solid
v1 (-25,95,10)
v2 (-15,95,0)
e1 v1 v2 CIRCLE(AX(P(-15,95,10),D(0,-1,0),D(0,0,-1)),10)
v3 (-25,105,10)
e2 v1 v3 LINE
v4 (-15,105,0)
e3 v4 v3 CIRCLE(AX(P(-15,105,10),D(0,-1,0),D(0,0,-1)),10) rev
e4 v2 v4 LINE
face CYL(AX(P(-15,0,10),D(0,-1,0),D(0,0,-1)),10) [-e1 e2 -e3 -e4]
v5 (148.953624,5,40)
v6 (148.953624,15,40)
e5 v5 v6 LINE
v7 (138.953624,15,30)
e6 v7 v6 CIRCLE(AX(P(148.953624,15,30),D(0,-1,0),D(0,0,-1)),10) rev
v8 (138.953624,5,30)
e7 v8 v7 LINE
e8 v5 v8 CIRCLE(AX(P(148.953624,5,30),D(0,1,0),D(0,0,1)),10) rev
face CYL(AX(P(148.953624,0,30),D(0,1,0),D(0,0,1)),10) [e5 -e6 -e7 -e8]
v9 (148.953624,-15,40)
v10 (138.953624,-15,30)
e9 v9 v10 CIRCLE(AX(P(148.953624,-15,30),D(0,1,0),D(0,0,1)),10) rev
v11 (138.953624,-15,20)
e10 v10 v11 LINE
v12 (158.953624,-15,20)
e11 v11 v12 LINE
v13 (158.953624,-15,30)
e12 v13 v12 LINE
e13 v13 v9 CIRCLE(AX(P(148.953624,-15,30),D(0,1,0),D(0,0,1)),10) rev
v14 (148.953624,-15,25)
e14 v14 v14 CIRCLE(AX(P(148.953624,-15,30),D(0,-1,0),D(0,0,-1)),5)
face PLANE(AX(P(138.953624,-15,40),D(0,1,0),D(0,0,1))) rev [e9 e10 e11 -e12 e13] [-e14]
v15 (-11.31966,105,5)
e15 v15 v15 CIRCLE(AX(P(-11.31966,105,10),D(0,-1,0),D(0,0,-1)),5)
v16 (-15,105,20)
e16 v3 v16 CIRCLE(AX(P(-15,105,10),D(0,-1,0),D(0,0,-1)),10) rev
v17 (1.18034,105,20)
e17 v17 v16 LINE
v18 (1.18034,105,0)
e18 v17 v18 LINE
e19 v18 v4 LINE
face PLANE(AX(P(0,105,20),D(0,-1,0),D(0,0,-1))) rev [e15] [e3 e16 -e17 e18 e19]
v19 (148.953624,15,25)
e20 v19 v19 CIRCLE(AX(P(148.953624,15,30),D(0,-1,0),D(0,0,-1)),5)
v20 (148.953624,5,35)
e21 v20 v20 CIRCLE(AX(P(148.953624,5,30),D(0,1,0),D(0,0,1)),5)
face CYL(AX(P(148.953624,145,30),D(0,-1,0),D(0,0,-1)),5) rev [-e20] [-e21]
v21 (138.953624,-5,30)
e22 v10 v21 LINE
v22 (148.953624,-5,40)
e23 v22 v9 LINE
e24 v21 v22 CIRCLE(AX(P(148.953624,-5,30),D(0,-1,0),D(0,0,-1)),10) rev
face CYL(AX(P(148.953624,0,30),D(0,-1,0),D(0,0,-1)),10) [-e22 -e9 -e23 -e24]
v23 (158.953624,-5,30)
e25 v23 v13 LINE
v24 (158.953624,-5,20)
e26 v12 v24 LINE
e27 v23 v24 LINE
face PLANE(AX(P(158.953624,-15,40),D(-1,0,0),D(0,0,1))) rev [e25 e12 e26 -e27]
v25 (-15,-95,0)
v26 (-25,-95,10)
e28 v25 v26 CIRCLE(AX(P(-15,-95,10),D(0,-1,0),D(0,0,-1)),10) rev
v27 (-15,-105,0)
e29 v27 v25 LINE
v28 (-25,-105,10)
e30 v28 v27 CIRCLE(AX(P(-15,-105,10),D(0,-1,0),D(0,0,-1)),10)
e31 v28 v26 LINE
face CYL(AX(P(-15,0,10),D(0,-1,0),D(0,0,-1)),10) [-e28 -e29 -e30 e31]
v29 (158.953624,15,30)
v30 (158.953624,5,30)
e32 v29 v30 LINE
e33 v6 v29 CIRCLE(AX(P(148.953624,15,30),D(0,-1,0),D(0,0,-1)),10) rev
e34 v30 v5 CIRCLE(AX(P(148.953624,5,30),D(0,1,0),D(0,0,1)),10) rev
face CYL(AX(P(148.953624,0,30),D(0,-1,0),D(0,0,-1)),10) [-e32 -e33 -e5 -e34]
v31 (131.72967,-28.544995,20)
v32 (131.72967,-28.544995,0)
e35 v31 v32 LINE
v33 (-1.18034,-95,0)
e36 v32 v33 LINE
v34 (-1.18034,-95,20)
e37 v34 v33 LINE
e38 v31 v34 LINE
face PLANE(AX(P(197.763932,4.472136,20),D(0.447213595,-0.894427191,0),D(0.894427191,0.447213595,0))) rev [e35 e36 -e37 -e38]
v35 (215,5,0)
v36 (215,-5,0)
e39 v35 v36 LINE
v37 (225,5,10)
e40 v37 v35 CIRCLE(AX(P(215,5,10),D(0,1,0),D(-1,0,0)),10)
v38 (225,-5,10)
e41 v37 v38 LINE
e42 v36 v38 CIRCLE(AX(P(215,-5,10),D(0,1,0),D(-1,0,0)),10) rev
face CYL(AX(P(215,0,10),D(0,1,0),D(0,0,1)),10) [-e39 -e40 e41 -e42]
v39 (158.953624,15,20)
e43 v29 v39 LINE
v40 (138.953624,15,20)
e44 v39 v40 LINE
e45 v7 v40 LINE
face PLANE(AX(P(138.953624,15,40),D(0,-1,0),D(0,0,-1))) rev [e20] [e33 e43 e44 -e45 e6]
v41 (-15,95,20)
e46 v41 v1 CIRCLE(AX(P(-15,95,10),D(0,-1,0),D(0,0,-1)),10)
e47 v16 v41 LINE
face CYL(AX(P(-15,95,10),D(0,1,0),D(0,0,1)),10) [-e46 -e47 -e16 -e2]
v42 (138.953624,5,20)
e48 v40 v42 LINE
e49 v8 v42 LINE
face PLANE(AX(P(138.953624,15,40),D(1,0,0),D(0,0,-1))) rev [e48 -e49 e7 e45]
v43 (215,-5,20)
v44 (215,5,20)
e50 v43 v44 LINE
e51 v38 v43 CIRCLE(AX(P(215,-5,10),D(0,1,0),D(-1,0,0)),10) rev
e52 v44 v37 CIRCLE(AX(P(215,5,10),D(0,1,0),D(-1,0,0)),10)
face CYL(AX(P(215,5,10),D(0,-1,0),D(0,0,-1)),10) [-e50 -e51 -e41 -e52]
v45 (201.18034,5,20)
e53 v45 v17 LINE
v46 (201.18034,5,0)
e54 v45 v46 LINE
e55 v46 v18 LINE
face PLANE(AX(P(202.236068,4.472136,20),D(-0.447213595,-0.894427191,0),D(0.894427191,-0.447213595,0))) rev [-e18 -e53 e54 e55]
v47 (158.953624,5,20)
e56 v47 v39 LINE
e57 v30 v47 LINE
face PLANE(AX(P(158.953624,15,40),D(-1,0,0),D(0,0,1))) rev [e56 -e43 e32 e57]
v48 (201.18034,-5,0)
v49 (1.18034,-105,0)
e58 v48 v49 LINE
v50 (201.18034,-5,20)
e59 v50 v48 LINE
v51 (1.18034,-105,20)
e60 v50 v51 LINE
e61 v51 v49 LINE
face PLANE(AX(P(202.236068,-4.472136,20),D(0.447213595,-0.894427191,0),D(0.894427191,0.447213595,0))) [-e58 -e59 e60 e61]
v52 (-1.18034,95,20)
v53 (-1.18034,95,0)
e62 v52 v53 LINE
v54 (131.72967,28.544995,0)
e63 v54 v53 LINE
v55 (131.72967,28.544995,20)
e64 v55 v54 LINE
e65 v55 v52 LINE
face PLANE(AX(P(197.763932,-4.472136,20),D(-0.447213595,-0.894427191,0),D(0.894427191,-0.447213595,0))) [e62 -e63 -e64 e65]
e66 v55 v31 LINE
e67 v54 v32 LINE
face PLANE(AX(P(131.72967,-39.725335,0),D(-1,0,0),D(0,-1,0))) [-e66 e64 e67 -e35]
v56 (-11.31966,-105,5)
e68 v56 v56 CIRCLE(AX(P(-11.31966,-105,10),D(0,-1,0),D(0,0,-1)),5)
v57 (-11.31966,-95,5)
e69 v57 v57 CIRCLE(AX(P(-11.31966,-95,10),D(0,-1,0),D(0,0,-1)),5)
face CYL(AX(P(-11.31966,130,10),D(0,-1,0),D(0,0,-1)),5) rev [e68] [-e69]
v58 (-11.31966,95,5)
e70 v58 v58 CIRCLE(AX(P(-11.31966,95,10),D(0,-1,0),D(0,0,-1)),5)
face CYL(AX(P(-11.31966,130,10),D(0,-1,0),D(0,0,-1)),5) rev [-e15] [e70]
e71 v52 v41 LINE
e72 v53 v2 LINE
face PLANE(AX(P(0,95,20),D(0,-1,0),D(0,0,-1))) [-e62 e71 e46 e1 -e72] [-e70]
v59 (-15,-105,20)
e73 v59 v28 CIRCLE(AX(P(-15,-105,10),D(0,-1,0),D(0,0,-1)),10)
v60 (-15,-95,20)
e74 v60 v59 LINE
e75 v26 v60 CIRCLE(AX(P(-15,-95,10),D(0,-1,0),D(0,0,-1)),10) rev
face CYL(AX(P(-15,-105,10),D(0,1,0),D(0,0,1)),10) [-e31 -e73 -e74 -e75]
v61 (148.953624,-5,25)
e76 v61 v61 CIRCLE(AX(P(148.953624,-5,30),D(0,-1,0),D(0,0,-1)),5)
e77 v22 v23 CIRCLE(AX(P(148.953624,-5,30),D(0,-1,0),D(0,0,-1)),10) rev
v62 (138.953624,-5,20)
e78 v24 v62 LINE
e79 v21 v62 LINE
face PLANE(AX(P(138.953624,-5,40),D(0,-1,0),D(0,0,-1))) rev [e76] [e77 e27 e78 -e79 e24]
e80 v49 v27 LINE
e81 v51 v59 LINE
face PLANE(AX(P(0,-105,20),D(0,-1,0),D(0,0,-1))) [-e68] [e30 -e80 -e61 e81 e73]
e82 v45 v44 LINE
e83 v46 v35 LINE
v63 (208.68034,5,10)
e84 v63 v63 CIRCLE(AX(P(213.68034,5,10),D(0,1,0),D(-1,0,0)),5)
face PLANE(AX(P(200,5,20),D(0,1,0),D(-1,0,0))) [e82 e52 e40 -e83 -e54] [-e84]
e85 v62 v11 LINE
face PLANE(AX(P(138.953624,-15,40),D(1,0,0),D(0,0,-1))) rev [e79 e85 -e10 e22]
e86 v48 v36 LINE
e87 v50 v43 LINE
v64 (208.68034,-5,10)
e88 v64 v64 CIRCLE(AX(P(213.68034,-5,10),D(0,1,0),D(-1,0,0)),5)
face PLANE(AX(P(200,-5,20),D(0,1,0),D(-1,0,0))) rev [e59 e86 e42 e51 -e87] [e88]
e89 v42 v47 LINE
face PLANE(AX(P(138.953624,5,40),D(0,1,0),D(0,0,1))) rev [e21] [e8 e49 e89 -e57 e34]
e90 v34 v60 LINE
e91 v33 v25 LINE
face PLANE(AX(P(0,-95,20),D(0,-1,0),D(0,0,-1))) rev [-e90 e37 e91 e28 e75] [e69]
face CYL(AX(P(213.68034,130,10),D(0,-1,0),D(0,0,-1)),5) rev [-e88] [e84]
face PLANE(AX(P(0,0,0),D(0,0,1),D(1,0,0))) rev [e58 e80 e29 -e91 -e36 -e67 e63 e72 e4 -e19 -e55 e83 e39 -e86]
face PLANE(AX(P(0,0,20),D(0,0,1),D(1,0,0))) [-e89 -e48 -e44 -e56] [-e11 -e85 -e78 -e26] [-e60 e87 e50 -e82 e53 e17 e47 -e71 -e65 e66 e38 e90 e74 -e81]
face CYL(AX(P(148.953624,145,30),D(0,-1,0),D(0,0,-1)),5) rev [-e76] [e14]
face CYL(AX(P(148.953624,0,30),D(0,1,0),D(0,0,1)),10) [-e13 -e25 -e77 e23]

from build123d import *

# Parameters (mm, degrees)
EXTRUDE_THIN4_DEPTH = 20
SKETCH2_R           = 5
CUT_EXTRUDE1_DEPTH  = 235
BOSS_EXTRUDE1_DEPTH = 20
SKETCH4_W           = 20
SKETCH4_H           = 10
BOSS_EXTRUDE2_DEPTH = 20
SKETCH5_R           = 5
CUT_EXTRUDE2_DEPTH  = 160
FILLET1_R           = 10


# Read off the part's stored shape, not the designer's step: Extrude-Thin4
with BuildPart() as part:
    # Extrude-Thin4 outline → Extrude-Thin4 (new body)
    with BuildSketch(Plane.XY):
        Polygon((201.180339887, 5), (1.180339887, 105), (-25, 105), (-25, 95), (-1.180339887, 95), (188.819660113, 0), (-1.180339887, -95), (-25, -95), (-25, -105), (1.180339887, -105), (201.180339887, -5), (225, -5), (225, 5), align=None)
    extrude(amount=EXTRUDE_THIN4_DEPTH)

    # Sketch2 → Cut-Extrude1 (cut)
    with BuildSketch(Plane.XZ.offset(105)):
        with Locations(Location((-11.319660113, 10, 0), (0, 0, 270))):
            Circle(SKETCH2_R)
        with Locations(Location((213.680339887, 10, 0), (0, 0, 180))):
            Circle(SKETCH2_R)
    extrude(amount=-CUT_EXTRUDE1_DEPTH, mode=Mode.SUBTRACT)

    # Sketch3 → Boss-Extrude1 (add)
    with BuildSketch(Plane.XY.offset(20)):
        Polygon((131.729669907, -39.72533499), (131.729669907, 39.72533499), (190.16352069, 10.508409599), (190.16352069, -10.508409599), align=None)
    extrude(amount=-BOSS_EXTRUDE1_DEPTH)

    # Sketch4 → Boss-Extrude2 (add)
    with BuildSketch(Plane.XY.offset(20)):
        with Locations((148.953623882, -10)):
            Rectangle(SKETCH4_W, SKETCH4_H)
        with Locations((148.953623882, 10)):
            Rectangle(SKETCH4_W, SKETCH4_H)
    extrude(amount=BOSS_EXTRUDE2_DEPTH)

    # Sketch5 → Cut-Extrude2 (cut)
    with BuildSketch(Plane.XZ.offset(15)):
        with Locations(Location((148.953623882, 30, 0), (0, 0, 270))):
            Circle(SKETCH5_R)
    extrude(amount=-CUT_EXTRUDE2_DEPTH, mode=Mode.SUBTRACT)

    # Fillet1
    fillet1_edges = [part.edges().sort_by_distance(p)[0] for p in [
        (225, 0, 0),
        (225, 0, 20),
        (-25, 100, 0),
        (-25, 100, 20),
        (-25, -100, 0),
        (-25, -100, 20),
        (138.953623882, 10, 40),
        (158.953623882, 10, 40),
        (158.953623882, -10, 40),
        (138.953623882, -10, 40),
    ]]
    fillet(fillet1_edges, radius=FILLET1_R - 0.0001)  # a hair under: the kernel refuses the full size


solid = part.part
